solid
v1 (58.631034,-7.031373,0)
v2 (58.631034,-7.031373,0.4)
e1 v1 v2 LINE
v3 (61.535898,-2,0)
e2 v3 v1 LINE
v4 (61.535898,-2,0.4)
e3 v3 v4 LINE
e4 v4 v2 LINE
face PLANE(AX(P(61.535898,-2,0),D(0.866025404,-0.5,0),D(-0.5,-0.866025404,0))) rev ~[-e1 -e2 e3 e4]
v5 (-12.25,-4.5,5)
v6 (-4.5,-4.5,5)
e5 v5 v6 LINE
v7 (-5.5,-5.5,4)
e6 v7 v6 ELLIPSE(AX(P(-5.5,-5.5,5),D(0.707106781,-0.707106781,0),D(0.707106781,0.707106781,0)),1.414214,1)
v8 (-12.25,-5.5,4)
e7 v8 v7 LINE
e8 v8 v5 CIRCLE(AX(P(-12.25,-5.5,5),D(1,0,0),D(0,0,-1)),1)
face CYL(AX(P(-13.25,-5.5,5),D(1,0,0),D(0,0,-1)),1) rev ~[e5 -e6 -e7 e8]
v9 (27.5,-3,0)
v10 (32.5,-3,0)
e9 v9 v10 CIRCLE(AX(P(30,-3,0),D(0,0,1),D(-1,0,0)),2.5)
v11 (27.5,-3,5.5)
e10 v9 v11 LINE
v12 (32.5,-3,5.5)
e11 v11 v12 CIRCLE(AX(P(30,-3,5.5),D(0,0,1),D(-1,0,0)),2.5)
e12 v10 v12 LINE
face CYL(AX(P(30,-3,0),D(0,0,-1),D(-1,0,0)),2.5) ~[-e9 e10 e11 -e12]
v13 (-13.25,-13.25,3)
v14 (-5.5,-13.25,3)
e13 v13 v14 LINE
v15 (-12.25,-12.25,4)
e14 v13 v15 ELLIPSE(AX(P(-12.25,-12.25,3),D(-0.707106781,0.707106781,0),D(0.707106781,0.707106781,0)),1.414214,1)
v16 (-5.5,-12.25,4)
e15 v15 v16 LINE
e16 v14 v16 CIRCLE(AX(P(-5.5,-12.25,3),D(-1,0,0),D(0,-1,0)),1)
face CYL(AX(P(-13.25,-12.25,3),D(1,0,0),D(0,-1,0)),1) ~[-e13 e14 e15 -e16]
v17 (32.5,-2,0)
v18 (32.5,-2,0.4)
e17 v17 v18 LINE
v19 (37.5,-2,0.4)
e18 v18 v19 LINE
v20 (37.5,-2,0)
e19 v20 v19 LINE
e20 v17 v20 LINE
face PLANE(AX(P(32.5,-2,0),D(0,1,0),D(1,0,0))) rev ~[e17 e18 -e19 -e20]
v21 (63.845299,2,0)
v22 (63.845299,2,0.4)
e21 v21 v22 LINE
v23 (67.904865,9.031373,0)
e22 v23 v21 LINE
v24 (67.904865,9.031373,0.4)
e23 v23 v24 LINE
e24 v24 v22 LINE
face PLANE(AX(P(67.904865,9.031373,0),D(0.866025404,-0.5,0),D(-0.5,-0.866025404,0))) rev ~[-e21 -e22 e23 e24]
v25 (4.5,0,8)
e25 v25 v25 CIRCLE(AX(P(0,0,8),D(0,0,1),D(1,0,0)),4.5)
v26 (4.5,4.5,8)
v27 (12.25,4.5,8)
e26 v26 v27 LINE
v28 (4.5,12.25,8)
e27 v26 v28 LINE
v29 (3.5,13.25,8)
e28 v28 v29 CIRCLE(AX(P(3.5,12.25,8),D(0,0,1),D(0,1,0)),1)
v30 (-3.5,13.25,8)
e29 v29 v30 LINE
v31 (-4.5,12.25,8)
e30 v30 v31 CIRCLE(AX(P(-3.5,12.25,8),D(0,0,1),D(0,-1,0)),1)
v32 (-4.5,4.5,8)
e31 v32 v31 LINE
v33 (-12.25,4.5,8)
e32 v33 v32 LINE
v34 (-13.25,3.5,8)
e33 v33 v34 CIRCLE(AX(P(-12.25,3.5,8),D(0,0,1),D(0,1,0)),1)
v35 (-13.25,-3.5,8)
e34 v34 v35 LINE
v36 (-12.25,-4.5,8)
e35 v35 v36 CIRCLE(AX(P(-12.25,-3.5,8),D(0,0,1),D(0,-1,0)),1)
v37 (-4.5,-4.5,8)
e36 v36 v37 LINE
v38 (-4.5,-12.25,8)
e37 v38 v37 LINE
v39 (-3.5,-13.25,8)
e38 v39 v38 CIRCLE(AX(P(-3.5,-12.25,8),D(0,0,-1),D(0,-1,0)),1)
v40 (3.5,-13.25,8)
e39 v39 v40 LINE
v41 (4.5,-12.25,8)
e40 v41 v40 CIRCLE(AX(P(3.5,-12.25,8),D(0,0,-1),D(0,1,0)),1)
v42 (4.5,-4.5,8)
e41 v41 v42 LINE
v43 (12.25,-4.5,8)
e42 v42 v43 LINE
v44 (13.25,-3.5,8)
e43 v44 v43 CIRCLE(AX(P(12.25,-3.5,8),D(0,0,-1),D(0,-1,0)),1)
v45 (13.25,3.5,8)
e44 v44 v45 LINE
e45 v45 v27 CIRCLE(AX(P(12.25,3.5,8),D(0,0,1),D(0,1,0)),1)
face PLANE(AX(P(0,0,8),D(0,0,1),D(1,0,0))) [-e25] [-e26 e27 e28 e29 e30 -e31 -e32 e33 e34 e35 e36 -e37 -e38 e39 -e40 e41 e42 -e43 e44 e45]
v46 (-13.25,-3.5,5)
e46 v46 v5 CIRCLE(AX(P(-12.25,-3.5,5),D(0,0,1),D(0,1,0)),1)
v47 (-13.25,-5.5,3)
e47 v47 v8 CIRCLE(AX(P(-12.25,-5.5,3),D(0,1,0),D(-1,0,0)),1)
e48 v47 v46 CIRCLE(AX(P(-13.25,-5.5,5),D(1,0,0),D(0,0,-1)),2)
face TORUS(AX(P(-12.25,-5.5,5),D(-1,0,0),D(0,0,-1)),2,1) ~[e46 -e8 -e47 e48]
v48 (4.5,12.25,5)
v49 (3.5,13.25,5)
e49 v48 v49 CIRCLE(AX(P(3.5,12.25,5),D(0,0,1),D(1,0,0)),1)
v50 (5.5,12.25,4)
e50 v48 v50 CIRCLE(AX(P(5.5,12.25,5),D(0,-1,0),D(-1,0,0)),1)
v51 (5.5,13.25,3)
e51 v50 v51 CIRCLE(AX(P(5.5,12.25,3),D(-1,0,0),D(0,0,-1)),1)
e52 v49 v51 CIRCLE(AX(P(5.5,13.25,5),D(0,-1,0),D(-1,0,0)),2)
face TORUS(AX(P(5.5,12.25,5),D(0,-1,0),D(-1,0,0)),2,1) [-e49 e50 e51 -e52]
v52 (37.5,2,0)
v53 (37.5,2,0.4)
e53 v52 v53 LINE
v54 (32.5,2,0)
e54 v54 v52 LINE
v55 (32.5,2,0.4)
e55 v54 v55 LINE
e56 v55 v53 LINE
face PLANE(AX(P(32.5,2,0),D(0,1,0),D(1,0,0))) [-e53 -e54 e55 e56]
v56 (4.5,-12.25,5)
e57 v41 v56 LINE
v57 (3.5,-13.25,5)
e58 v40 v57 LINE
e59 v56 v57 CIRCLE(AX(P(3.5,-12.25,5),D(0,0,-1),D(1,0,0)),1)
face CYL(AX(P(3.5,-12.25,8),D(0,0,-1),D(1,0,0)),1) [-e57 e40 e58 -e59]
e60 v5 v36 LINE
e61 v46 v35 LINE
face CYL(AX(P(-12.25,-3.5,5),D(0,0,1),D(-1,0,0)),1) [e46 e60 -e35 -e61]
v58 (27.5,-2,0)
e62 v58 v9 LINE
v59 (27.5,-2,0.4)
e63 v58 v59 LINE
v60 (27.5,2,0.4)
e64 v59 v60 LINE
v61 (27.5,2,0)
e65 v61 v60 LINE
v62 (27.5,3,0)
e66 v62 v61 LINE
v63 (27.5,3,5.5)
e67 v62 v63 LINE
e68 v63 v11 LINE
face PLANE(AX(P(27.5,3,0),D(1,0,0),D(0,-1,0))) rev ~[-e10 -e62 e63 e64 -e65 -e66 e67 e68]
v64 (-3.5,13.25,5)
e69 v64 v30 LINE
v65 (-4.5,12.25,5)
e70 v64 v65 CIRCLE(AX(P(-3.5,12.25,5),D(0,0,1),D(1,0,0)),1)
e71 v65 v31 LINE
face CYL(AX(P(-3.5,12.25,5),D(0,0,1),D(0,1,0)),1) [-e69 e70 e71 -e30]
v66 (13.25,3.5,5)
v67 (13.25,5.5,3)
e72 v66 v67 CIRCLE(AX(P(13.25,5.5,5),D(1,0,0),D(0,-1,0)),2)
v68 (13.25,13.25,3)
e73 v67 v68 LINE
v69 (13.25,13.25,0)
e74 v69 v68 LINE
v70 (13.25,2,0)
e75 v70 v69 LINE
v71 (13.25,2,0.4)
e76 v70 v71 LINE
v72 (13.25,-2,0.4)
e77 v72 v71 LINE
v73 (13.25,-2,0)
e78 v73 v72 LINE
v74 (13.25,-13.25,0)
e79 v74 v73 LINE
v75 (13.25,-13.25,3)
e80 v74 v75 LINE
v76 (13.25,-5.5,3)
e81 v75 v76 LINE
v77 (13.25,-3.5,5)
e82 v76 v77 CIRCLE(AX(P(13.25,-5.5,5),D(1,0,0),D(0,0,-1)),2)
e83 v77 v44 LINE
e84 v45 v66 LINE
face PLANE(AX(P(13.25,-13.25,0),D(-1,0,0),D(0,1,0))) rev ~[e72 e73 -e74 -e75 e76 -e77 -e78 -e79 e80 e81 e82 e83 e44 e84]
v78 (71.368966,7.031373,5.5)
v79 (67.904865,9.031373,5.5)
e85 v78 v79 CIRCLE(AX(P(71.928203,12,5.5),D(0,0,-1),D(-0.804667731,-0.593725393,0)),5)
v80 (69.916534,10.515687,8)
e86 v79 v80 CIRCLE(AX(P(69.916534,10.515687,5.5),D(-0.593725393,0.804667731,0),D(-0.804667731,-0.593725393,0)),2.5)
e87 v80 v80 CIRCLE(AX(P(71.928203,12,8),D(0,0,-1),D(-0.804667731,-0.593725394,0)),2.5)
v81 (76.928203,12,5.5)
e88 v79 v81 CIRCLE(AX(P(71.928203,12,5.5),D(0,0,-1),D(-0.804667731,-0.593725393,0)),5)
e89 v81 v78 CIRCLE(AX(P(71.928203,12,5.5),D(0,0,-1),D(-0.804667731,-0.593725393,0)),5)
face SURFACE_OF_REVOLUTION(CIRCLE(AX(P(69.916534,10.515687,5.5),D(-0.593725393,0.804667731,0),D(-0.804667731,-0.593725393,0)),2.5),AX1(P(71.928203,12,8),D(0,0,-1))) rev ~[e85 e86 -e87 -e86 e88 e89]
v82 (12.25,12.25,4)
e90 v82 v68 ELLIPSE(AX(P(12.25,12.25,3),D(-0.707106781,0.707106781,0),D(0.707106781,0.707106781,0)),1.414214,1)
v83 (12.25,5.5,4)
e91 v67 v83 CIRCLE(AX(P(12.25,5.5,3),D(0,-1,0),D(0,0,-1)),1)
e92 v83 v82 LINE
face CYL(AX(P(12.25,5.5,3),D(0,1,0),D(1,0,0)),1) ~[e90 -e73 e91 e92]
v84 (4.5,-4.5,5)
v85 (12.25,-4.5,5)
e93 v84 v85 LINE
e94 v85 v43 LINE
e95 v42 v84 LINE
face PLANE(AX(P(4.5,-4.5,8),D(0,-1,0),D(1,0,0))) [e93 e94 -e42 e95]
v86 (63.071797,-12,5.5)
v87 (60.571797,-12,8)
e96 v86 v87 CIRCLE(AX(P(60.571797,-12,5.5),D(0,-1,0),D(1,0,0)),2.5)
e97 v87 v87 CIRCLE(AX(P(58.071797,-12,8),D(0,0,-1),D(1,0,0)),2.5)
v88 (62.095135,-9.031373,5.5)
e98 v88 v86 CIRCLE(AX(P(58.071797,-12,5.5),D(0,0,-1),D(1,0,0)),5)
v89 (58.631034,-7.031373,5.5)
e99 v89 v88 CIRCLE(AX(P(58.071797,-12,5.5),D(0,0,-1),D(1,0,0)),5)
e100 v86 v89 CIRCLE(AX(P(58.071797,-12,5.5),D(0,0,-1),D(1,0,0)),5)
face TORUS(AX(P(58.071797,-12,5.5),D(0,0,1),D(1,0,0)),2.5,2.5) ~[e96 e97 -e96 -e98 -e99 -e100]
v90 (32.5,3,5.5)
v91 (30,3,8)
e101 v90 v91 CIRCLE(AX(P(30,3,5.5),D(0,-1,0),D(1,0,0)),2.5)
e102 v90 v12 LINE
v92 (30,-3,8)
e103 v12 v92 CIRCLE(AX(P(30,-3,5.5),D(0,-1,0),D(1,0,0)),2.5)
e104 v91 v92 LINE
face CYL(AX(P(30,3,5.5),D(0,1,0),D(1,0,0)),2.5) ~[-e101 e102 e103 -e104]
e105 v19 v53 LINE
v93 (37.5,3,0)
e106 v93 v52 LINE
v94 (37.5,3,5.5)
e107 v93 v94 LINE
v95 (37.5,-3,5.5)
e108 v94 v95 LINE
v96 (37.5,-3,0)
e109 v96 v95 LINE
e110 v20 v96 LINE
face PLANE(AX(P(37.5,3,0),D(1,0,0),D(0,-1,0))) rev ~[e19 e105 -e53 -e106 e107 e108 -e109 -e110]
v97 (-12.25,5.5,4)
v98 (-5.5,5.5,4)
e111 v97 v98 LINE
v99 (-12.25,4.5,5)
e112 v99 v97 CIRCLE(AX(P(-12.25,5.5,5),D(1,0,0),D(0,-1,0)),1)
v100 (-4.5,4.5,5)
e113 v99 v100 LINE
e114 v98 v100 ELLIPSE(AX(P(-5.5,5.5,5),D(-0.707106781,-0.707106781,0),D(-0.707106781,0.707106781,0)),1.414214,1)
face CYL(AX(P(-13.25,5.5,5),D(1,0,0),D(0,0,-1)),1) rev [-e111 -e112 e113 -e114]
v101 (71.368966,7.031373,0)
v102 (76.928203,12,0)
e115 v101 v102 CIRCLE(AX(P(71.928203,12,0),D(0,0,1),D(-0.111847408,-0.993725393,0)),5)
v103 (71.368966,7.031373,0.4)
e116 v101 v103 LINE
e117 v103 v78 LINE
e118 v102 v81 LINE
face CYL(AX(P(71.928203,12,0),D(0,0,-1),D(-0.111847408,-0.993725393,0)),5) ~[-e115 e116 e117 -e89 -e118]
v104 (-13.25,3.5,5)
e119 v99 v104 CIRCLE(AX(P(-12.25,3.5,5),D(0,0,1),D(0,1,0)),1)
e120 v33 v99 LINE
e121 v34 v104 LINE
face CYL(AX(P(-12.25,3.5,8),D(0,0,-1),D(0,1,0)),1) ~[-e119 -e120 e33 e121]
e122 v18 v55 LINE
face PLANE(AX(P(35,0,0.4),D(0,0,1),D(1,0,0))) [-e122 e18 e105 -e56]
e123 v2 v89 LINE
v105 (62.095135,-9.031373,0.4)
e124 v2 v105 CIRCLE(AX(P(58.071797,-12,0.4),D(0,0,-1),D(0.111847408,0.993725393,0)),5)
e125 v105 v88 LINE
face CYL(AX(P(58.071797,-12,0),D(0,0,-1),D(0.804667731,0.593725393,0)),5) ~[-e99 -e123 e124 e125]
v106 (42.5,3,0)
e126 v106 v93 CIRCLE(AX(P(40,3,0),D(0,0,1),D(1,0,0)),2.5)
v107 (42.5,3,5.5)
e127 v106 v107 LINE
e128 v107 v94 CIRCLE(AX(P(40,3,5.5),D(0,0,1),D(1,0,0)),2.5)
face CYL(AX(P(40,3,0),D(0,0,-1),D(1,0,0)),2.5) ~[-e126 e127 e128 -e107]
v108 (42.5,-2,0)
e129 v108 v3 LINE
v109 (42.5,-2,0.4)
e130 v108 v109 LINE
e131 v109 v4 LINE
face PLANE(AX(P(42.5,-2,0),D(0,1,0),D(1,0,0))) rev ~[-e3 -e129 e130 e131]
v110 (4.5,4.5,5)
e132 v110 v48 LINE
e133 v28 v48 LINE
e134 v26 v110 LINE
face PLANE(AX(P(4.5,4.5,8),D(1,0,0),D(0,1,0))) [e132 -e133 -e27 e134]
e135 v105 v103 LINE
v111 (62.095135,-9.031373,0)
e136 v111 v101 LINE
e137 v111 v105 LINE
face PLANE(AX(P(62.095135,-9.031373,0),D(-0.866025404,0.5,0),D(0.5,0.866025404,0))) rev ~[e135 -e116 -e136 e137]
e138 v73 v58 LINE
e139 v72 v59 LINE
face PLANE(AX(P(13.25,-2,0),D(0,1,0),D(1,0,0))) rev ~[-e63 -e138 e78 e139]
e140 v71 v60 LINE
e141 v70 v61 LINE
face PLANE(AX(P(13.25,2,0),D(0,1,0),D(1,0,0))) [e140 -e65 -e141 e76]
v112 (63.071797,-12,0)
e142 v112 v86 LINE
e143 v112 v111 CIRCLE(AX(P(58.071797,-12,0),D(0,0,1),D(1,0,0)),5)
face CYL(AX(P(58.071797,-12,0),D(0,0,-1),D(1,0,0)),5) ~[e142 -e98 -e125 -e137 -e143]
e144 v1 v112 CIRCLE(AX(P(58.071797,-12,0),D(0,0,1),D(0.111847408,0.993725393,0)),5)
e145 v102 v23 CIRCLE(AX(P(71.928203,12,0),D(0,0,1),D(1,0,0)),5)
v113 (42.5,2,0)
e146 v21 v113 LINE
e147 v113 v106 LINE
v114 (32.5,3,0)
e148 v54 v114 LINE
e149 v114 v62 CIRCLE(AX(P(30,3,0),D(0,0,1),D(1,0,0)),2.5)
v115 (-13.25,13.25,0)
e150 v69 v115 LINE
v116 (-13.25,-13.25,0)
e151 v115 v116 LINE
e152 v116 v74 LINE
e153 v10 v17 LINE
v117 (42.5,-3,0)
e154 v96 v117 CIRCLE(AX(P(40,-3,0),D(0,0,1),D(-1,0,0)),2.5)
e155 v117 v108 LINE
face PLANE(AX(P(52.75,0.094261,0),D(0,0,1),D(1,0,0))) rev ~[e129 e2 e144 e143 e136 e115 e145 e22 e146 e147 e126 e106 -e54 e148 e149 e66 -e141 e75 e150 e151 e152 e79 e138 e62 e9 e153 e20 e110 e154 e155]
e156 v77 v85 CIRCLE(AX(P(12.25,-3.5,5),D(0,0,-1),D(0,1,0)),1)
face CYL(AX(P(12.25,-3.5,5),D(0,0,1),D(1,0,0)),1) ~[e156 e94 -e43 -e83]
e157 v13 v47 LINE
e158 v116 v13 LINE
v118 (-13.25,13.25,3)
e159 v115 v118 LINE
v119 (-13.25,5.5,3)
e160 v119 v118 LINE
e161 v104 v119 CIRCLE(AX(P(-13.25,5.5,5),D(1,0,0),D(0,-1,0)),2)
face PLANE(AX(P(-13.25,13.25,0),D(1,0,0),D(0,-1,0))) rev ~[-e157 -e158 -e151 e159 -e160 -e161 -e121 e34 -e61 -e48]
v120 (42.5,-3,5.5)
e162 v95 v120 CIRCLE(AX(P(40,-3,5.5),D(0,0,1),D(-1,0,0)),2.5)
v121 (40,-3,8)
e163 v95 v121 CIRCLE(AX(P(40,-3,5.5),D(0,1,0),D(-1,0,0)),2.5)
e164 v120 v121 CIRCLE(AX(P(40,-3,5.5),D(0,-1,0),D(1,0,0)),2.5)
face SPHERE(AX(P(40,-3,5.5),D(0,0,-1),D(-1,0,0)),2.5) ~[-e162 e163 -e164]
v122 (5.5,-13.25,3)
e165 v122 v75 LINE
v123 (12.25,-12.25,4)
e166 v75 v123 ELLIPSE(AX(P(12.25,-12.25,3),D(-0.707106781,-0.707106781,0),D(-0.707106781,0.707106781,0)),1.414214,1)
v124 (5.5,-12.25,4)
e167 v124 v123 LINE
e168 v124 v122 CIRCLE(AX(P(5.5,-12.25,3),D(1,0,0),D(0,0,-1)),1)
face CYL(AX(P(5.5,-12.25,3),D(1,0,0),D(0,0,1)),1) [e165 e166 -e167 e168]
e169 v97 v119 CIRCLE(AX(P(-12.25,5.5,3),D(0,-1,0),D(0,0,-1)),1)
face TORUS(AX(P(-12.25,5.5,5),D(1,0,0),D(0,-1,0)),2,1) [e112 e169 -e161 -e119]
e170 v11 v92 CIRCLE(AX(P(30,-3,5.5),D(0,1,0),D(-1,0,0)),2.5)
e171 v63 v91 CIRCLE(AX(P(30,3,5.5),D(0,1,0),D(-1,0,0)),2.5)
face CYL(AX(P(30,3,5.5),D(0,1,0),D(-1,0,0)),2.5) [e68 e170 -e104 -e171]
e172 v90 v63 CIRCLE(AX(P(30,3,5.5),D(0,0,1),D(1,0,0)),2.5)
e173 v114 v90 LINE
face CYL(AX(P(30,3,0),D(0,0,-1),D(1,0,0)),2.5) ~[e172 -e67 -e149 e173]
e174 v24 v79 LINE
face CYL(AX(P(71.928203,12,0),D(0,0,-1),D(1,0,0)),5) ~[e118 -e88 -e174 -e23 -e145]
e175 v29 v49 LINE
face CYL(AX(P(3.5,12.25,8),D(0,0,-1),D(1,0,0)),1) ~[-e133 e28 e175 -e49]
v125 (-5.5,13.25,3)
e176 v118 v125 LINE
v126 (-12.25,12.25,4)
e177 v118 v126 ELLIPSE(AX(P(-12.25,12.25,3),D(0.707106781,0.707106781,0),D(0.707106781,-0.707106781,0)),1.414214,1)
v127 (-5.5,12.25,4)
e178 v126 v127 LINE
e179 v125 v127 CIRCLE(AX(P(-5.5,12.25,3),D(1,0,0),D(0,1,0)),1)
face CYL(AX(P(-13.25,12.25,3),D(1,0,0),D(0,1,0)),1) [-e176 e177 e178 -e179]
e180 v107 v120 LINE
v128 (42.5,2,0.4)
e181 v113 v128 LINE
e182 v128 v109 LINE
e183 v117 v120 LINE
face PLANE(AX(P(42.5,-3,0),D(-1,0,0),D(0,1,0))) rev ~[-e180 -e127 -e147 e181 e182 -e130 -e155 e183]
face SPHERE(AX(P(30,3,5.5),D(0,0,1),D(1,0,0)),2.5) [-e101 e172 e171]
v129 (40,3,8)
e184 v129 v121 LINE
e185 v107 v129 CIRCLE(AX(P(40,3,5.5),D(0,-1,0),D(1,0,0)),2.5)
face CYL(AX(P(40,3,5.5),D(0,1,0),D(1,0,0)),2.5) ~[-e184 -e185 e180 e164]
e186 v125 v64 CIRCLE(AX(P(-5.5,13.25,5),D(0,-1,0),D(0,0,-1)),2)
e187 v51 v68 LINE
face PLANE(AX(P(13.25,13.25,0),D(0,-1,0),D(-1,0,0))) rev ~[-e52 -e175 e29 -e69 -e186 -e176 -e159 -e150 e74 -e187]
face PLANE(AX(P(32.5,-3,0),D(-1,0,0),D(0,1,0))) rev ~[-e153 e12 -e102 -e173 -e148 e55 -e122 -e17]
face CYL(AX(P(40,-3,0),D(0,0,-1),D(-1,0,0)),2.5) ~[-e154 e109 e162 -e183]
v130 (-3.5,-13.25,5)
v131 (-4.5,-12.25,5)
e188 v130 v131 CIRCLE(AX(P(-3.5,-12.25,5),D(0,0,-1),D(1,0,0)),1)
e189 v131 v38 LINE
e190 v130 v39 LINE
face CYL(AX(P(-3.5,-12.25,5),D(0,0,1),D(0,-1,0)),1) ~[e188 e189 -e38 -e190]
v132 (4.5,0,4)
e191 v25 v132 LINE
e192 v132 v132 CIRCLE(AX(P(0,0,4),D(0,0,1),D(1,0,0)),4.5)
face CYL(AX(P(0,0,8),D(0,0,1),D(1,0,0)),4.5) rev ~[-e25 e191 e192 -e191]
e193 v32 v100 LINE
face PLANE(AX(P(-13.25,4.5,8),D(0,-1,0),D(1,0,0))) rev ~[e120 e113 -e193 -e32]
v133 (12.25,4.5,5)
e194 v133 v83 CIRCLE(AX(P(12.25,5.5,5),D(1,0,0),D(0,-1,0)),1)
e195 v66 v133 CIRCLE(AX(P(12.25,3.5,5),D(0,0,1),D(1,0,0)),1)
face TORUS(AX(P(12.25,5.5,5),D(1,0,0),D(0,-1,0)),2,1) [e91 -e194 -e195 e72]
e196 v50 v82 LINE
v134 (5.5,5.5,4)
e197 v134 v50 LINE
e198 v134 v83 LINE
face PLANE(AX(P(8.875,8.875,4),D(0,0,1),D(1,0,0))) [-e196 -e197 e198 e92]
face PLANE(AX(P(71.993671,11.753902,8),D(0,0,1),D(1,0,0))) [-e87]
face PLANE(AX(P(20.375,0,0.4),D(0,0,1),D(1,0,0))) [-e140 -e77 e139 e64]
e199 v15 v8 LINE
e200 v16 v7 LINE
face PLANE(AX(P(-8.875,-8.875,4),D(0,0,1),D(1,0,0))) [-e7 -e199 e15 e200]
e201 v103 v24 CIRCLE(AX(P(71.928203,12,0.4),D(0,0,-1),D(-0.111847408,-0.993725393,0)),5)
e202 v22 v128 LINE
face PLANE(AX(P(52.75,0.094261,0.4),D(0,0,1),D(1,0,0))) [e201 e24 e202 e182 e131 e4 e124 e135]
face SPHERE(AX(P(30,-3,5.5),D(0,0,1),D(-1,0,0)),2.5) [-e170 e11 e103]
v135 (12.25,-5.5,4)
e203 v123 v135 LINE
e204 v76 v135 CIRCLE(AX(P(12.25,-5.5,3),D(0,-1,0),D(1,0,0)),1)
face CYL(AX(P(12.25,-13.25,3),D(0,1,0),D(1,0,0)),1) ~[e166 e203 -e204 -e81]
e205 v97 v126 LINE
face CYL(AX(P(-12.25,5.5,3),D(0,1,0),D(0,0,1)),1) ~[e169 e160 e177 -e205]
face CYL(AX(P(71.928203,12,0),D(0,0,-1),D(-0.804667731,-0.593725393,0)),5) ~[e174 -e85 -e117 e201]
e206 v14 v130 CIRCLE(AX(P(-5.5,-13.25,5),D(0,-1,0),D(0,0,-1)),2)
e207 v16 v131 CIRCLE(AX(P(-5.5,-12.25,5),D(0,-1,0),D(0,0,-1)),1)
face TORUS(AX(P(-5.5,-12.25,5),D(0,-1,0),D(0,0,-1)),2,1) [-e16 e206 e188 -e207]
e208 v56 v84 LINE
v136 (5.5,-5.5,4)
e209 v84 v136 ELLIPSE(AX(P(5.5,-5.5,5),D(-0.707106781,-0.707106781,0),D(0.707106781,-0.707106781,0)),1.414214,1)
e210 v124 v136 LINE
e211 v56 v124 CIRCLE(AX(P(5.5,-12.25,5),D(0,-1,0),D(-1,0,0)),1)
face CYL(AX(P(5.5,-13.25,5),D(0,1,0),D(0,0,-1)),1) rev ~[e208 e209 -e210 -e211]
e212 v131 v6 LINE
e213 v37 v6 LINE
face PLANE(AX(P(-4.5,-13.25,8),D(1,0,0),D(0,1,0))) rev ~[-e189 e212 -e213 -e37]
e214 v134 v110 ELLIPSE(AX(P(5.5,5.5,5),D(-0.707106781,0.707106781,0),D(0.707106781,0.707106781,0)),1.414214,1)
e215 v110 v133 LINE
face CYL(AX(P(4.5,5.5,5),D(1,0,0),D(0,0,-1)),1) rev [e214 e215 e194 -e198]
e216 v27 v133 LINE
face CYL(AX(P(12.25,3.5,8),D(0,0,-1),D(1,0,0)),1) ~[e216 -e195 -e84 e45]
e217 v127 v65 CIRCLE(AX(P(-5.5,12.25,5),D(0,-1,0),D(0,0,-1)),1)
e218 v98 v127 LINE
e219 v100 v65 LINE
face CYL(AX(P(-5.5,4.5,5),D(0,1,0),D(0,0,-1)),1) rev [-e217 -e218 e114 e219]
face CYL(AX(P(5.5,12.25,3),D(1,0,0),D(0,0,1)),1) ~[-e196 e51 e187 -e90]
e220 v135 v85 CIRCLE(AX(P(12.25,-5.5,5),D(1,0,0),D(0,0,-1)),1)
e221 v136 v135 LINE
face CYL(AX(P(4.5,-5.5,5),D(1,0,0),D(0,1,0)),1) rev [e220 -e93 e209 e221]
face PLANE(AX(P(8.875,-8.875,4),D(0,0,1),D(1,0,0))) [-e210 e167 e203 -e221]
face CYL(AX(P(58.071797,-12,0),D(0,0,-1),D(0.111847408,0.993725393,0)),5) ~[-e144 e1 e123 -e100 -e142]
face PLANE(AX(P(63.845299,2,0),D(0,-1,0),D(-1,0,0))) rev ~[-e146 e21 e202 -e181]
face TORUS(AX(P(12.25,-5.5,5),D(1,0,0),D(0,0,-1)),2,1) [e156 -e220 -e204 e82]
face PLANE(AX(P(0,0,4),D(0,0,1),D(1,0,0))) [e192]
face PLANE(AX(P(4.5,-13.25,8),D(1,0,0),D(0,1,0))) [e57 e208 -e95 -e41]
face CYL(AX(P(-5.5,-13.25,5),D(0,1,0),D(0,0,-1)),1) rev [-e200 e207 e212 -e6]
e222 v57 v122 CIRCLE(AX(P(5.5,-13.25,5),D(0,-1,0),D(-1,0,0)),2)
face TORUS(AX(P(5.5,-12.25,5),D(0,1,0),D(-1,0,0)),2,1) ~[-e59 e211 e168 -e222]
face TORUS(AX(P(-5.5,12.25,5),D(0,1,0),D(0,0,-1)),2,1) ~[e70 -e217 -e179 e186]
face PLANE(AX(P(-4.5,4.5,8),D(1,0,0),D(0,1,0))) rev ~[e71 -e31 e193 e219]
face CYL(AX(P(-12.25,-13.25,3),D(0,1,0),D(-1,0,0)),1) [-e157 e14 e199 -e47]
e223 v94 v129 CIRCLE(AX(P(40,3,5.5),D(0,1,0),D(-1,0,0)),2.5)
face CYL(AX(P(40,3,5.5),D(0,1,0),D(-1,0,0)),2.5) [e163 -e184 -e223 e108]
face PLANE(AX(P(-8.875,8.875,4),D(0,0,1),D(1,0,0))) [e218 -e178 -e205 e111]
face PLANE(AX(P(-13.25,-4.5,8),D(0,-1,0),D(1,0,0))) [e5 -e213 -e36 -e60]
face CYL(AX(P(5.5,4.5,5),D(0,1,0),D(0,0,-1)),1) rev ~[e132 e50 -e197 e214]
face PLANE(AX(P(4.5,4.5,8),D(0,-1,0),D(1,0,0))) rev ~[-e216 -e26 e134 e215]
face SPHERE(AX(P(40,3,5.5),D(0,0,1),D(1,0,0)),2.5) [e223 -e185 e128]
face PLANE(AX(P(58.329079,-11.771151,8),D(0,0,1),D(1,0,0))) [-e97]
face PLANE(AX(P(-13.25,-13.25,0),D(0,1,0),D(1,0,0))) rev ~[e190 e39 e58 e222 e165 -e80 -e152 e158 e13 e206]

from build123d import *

# Parameters (mm, degrees)
F1_DEPTH     = 8
F0_W         = 14.25
F0_H         = 4
F0_W_2       = 5
F2_DEPTH     = 0.4
F3_T1_DEPTH  = 6
F3_T8_ANGLE  = 180
F3_T10_ANGLE = 180
F3_T12_ANGLE = 180
F3_T14_ANGLE = 180
F4_R         = 4.5
F4_W         = 8.75
F4_H         = 8.75
F5_DEPTH     = 4
F6_F1_R      = 1
F6_F2_R      = 1


# Not quite as in the source:
# - a fillet or chamfer that OpenCascade refuses, or shapes differently, is made with other operations: its cross-section is extruded or revolved along the edge and cut away or added


with BuildPart() as f1:
    # F0 (on Top) → F1 (new body)
    with BuildSketch(Plane.XY):
        Polygon((13.25, 2), (13.25, 13.25), (-13.25, 13.25), (-13.25, -13.25), (13.25, -13.25), (13.25, -2), align=None)
    extrude(amount=F1_DEPTH)



with BuildPart() as f1b:
    # F0 (on Top) → F1, piece 2 (new body)
    with BuildSketch(Plane.XY):
        with BuildLine():
            ThreePointArc((76.9282032303, 12), (70.3656241563, 16.7495627838), (67.9048645752, 9.0313730334))
            ThreePointArc((67.9048645752, 9.0313730334), (69.4282032303, 7.6698729811), (71.3689661904, 7.0313730334))
            ThreePointArc((71.3689661904, 7.0313730334), (75.260155721, 8.2719854346), (76.9282032303, 12))
        make_face()
    extrude(amount=F1_DEPTH)


with BuildPart() as f1c:
    # F0 (on Top) → F1, piece 3 (new body)
    with BuildSketch(Plane.XY):
        with BuildLine():
            ThreePointArc((62.0951354248, -9.0313730334), (60.5717967697, -7.6698729811), (58.6310338096, -7.0313730334))
            ThreePointArc((58.6310338096, -7.0313730334), (54.3437822043, -15.3319524907), (63.0717967697, -12))
            ThreePointArc((63.0717967697, -12), (62.8213595536, -10.437420926), (62.0951354248, -9.0313730334))
        make_face()
    extrude(amount=F1_DEPTH)


with BuildPart() as f1d:
    # F0 (on Top) → F1, piece 4 (new body)
    with BuildSketch(Plane.XY):
        with BuildLine():
            Line((27.5, 3), (27.5, 2))
            Line((27.5, 2), (27.5, -2))
            Line((27.5, -2), (27.5, -3))
            ThreePointArc((27.5, -3), (30, -5.5), (32.5, -3))
            Line((32.5, -3), (32.5, -2))
            Line((32.5, -2), (32.5, 2))
            Line((32.5, 2), (32.5, 3))
            ThreePointArc((32.5, 3), (30, 5.5), (27.5, 3))
        make_face()
    extrude(amount=F1_DEPTH)


with BuildPart() as f1e:
    # F0 (on Top) → F1, piece 5 (new body)
    with BuildSketch(Plane.XY):
        with BuildLine():
            Line((37.5, 3), (37.5, 2))
            Line((37.5, 2), (37.5, -2))
            Line((37.5, -2), (37.5, -3))
            ThreePointArc((37.5, -3), (40, -5.5), (42.5, -3))
            Line((42.5, -3), (42.5, -2))
            Line((42.5, -2), (42.5, 2))
            Line((42.5, 2), (42.5, 3))
            ThreePointArc((42.5, 3), (40, 5.5), (37.5, 3))
        make_face()
    extrude(amount=F1_DEPTH)


with BuildPart() as f1_1:
    add(f1.part)

    add(f1b.part)  # F2 merges F1b

    add(f1c.part)  # F2 merges F1c

    add(f1d.part)  # F2 merges F1d

    add(f1e.part)  # F2 merges F1e
    # F0 (on Top) → F2 (join)
    with BuildSketch(Plane.XY):
        with Locations((20.375, 0)):
            Rectangle(F0_W, F0_H)
        with Locations((35, 0)):
            Rectangle(F0_W_2, F0_H)
        Polygon((63.8452994616, 2), (42.5, 2), (42.5, -2), (61.5358983849, -2), align=None)
        with BuildLine():
            Line((67.9048645752, 9.0313730334), (63.8452994616, 2))
            Line((63.8452994616, 2), (61.5358983849, -2))
            Line((61.5358983849, -2), (58.6310338096, -7.0313730334))
            ThreePointArc((58.6310338096, -7.0313730334), (60.5717967697, -7.6698729811), (62.0951354248, -9.0313730334))
            Line((62.0951354248, -9.0313730334), (71.3689661904, 7.0313730334))
            ThreePointArc((71.3689661904, 7.0313730334), (69.4282032303, 7.6698729811), (67.9048645752, 9.0313730334))
        make_face()
    extrude(amount=F2_DEPTH)

    # F3: fillet of radius 2.5 on 10 edges, made by hand

    # F3_s2 → F3_t1 (cut)
    with BuildSketch(Plane.XZ.offset(-3)):
        with BuildLine():
            ThreePointArc((37.5, 5.5), (38.232233047, 7.267766953), (40, 8))
            Line((40, 8), (37.5, 8))
            Line((37.5, 8), (37.5, 5.5))
        make_face()
        with BuildLine():
            ThreePointArc((42.5, 5.5), (41.767766953, 7.267766953), (40, 8))
            Line((40, 8), (42.5, 8))
            Line((42.5, 8), (42.5, 5.5))
        make_face()
        with BuildLine():
            ThreePointArc((27.5, 5.5), (28.232233047, 7.267766953), (30, 8))
            Line((30, 8), (27.5, 8))
            Line((27.5, 8), (27.5, 5.5))
        make_face()
        with BuildLine():
            ThreePointArc((32.5, 5.5), (31.767766953, 7.267766953), (30, 8))
            Line((30, 8), (32.5, 8))
            Line((32.5, 8), (32.5, 5.5))
        make_face()
    extrude(amount=F3_T1_DEPTH, mode=Mode.SUBTRACT)

    # F3_s3 → F3_t4 (revolve, cut)
    with BuildSketch(Plane.XZ.offset(12)):
        with BuildLine():
            ThreePointArc((63.0717967697, 5.5), (62.3395637227, 7.267766953), (60.5717967697, 8))
            Line((60.5717967697, 8), (63.0717967697, 8))
            Line((63.0717967697, 8), (63.0717967697, 5.5))
        make_face()
    revolve(axis=Axis((58.0717967697, -12, 8), (0, 0, -1)), mode=Mode.SUBTRACT)

    # F3_s5 → F3_t6 (revolve, cut)
    with BuildSketch(Plane(origin=(19.6223796234, -26.5939369719, 0), x_dir=(0, 0, 1), z_dir=(0.5937253933, -0.804667731, 0))):
        with BuildLine():
            ThreePointArc((5.5, -60.0030088087), (7.267766953, -60.7352418558), (8, -62.5030088087))
            Line((8, -62.5030088087), (8, -60.0030088087))
            Line((8, -60.0030088087), (5.5, -60.0030088087))
        make_face()
    revolve(axis=Axis((71.9282032303, 12, 8), (0, 0, -1)), mode=Mode.SUBTRACT)

    # F3_s7 → F3_t8 (revolve, cut)
    with BuildSketch(Plane.XZ.offset(-3)):
        with BuildLine():
            ThreePointArc((42.5, 5.5), (41.767766953, 7.267766953), (40, 8))
            Line((40, 8), (42.5, 8))
            Line((42.5, 8), (42.5, 5.5))
        make_face()
    revolve(axis=Axis((40, 3, 8), (0, 0, 1)), revolution_arc=F3_T8_ANGLE, mode=Mode.SUBTRACT)

    # F3_s9 → F3_t10 (revolve, cut)
    with BuildSketch(Plane.XZ.offset(3)):
        with BuildLine():
            ThreePointArc((40, 8), (38.232233047, 7.267766953), (37.5, 5.5))
            Line((37.5, 5.5), (37.5, 8))
            Line((37.5, 8), (40, 8))
        make_face()
    revolve(axis=Axis((40, -3, 8), (0, 0, 1)), revolution_arc=F3_T10_ANGLE, mode=Mode.SUBTRACT)

    # F3_s11 → F3_t12 (revolve, cut)
    with BuildSketch(Plane.XZ.offset(-3)):
        with BuildLine():
            ThreePointArc((32.5, 5.5), (31.767766953, 7.267766953), (30, 8))
            Line((30, 8), (32.5, 8))
            Line((32.5, 8), (32.5, 5.5))
        make_face()
    revolve(axis=Axis((30, 3, 8), (0, 0, 1)), revolution_arc=F3_T12_ANGLE, mode=Mode.SUBTRACT)

    # F3_s13 → F3_t14 (revolve, cut)
    with BuildSketch(Plane.XZ.offset(3)):
        with BuildLine():
            ThreePointArc((27.5, 5.5), (28.232233047, 7.267766953), (30, 8))
            Line((30, 8), (27.5, 8))
            Line((27.5, 8), (27.5, 5.5))
        make_face()
    revolve(axis=Axis((30, -3, 8), (0, 0, 1)), revolution_arc=F3_T14_ANGLE, mode=Mode.SUBTRACT)

    # F4 (on face) → F5 (cut)
    with BuildSketch(Plane.XY.offset(8)):
        Circle(F4_R)
        with Locations((-8.875, 8.875)):
            Rectangle(F4_W, F4_H)
        with Locations((-8.875, -8.875)):
            Rectangle(F4_W, F4_H)
        with Locations((8.875, -8.875)):
            Rectangle(F4_W, F4_H)
        with Locations((8.875, 8.875)):
            Rectangle(F4_W, F4_H)
    extrude(amount=-F5_DEPTH, mode=Mode.SUBTRACT)

    # F6: fillet of radius 1 on 16 edges, made by hand

    # F6_f1
    f6_f1_edges = [f1_1.edges().sort_by_distance(p)[0] for p in [
        (8.875, -4.5, 4),
        (4.5, -8.875, 4),
        (4.5, 8.875, 4),
        (8.875, 4.5, 4),
        (-4.5, 8.875, 4),
        (-8.875, 4.5, 4),
        (-8.875, -4.5, 4),
        (-4.5, -8.875, 4),
    ]]
    fillet(f6_f1_edges, radius=F6_F1_R)

    # F6_f2
    f6_f2_edges = [f1_1.edges().sort_by_distance(p)[0] for p in [
        (13.25, -9.375, 4),
        (9.375, -13.25, 4),
        (9.375, 13.25, 4),
        (13.25, 9.375, 4),
        (-9.375, 13.25, 4),
        (-13.25, 9.375, 4),
        (-13.25, -9.375, 4),
        (-9.375, -13.25, 4),
        (-4.7928932188, -13.25, 4.2928932188),
        (-13.25, -4.7928932188, 4.2928932188),
        (-13.25, 4.7928932188, 4.2928932188),
        (-4.7928932188, 13.25, 4.2928932188),
        (13.25, 4.7928932188, 4.2928932188),
        (4.7928932188, 13.25, 4.2928932188),
        (4.7928932188, -13.25, 4.2928932188),
        (13.25, -4.7928932188, 4.2928932188),
    ]]
    fillet(f6_f2_edges, radius=F6_F2_R)


solid = f1_1.part
